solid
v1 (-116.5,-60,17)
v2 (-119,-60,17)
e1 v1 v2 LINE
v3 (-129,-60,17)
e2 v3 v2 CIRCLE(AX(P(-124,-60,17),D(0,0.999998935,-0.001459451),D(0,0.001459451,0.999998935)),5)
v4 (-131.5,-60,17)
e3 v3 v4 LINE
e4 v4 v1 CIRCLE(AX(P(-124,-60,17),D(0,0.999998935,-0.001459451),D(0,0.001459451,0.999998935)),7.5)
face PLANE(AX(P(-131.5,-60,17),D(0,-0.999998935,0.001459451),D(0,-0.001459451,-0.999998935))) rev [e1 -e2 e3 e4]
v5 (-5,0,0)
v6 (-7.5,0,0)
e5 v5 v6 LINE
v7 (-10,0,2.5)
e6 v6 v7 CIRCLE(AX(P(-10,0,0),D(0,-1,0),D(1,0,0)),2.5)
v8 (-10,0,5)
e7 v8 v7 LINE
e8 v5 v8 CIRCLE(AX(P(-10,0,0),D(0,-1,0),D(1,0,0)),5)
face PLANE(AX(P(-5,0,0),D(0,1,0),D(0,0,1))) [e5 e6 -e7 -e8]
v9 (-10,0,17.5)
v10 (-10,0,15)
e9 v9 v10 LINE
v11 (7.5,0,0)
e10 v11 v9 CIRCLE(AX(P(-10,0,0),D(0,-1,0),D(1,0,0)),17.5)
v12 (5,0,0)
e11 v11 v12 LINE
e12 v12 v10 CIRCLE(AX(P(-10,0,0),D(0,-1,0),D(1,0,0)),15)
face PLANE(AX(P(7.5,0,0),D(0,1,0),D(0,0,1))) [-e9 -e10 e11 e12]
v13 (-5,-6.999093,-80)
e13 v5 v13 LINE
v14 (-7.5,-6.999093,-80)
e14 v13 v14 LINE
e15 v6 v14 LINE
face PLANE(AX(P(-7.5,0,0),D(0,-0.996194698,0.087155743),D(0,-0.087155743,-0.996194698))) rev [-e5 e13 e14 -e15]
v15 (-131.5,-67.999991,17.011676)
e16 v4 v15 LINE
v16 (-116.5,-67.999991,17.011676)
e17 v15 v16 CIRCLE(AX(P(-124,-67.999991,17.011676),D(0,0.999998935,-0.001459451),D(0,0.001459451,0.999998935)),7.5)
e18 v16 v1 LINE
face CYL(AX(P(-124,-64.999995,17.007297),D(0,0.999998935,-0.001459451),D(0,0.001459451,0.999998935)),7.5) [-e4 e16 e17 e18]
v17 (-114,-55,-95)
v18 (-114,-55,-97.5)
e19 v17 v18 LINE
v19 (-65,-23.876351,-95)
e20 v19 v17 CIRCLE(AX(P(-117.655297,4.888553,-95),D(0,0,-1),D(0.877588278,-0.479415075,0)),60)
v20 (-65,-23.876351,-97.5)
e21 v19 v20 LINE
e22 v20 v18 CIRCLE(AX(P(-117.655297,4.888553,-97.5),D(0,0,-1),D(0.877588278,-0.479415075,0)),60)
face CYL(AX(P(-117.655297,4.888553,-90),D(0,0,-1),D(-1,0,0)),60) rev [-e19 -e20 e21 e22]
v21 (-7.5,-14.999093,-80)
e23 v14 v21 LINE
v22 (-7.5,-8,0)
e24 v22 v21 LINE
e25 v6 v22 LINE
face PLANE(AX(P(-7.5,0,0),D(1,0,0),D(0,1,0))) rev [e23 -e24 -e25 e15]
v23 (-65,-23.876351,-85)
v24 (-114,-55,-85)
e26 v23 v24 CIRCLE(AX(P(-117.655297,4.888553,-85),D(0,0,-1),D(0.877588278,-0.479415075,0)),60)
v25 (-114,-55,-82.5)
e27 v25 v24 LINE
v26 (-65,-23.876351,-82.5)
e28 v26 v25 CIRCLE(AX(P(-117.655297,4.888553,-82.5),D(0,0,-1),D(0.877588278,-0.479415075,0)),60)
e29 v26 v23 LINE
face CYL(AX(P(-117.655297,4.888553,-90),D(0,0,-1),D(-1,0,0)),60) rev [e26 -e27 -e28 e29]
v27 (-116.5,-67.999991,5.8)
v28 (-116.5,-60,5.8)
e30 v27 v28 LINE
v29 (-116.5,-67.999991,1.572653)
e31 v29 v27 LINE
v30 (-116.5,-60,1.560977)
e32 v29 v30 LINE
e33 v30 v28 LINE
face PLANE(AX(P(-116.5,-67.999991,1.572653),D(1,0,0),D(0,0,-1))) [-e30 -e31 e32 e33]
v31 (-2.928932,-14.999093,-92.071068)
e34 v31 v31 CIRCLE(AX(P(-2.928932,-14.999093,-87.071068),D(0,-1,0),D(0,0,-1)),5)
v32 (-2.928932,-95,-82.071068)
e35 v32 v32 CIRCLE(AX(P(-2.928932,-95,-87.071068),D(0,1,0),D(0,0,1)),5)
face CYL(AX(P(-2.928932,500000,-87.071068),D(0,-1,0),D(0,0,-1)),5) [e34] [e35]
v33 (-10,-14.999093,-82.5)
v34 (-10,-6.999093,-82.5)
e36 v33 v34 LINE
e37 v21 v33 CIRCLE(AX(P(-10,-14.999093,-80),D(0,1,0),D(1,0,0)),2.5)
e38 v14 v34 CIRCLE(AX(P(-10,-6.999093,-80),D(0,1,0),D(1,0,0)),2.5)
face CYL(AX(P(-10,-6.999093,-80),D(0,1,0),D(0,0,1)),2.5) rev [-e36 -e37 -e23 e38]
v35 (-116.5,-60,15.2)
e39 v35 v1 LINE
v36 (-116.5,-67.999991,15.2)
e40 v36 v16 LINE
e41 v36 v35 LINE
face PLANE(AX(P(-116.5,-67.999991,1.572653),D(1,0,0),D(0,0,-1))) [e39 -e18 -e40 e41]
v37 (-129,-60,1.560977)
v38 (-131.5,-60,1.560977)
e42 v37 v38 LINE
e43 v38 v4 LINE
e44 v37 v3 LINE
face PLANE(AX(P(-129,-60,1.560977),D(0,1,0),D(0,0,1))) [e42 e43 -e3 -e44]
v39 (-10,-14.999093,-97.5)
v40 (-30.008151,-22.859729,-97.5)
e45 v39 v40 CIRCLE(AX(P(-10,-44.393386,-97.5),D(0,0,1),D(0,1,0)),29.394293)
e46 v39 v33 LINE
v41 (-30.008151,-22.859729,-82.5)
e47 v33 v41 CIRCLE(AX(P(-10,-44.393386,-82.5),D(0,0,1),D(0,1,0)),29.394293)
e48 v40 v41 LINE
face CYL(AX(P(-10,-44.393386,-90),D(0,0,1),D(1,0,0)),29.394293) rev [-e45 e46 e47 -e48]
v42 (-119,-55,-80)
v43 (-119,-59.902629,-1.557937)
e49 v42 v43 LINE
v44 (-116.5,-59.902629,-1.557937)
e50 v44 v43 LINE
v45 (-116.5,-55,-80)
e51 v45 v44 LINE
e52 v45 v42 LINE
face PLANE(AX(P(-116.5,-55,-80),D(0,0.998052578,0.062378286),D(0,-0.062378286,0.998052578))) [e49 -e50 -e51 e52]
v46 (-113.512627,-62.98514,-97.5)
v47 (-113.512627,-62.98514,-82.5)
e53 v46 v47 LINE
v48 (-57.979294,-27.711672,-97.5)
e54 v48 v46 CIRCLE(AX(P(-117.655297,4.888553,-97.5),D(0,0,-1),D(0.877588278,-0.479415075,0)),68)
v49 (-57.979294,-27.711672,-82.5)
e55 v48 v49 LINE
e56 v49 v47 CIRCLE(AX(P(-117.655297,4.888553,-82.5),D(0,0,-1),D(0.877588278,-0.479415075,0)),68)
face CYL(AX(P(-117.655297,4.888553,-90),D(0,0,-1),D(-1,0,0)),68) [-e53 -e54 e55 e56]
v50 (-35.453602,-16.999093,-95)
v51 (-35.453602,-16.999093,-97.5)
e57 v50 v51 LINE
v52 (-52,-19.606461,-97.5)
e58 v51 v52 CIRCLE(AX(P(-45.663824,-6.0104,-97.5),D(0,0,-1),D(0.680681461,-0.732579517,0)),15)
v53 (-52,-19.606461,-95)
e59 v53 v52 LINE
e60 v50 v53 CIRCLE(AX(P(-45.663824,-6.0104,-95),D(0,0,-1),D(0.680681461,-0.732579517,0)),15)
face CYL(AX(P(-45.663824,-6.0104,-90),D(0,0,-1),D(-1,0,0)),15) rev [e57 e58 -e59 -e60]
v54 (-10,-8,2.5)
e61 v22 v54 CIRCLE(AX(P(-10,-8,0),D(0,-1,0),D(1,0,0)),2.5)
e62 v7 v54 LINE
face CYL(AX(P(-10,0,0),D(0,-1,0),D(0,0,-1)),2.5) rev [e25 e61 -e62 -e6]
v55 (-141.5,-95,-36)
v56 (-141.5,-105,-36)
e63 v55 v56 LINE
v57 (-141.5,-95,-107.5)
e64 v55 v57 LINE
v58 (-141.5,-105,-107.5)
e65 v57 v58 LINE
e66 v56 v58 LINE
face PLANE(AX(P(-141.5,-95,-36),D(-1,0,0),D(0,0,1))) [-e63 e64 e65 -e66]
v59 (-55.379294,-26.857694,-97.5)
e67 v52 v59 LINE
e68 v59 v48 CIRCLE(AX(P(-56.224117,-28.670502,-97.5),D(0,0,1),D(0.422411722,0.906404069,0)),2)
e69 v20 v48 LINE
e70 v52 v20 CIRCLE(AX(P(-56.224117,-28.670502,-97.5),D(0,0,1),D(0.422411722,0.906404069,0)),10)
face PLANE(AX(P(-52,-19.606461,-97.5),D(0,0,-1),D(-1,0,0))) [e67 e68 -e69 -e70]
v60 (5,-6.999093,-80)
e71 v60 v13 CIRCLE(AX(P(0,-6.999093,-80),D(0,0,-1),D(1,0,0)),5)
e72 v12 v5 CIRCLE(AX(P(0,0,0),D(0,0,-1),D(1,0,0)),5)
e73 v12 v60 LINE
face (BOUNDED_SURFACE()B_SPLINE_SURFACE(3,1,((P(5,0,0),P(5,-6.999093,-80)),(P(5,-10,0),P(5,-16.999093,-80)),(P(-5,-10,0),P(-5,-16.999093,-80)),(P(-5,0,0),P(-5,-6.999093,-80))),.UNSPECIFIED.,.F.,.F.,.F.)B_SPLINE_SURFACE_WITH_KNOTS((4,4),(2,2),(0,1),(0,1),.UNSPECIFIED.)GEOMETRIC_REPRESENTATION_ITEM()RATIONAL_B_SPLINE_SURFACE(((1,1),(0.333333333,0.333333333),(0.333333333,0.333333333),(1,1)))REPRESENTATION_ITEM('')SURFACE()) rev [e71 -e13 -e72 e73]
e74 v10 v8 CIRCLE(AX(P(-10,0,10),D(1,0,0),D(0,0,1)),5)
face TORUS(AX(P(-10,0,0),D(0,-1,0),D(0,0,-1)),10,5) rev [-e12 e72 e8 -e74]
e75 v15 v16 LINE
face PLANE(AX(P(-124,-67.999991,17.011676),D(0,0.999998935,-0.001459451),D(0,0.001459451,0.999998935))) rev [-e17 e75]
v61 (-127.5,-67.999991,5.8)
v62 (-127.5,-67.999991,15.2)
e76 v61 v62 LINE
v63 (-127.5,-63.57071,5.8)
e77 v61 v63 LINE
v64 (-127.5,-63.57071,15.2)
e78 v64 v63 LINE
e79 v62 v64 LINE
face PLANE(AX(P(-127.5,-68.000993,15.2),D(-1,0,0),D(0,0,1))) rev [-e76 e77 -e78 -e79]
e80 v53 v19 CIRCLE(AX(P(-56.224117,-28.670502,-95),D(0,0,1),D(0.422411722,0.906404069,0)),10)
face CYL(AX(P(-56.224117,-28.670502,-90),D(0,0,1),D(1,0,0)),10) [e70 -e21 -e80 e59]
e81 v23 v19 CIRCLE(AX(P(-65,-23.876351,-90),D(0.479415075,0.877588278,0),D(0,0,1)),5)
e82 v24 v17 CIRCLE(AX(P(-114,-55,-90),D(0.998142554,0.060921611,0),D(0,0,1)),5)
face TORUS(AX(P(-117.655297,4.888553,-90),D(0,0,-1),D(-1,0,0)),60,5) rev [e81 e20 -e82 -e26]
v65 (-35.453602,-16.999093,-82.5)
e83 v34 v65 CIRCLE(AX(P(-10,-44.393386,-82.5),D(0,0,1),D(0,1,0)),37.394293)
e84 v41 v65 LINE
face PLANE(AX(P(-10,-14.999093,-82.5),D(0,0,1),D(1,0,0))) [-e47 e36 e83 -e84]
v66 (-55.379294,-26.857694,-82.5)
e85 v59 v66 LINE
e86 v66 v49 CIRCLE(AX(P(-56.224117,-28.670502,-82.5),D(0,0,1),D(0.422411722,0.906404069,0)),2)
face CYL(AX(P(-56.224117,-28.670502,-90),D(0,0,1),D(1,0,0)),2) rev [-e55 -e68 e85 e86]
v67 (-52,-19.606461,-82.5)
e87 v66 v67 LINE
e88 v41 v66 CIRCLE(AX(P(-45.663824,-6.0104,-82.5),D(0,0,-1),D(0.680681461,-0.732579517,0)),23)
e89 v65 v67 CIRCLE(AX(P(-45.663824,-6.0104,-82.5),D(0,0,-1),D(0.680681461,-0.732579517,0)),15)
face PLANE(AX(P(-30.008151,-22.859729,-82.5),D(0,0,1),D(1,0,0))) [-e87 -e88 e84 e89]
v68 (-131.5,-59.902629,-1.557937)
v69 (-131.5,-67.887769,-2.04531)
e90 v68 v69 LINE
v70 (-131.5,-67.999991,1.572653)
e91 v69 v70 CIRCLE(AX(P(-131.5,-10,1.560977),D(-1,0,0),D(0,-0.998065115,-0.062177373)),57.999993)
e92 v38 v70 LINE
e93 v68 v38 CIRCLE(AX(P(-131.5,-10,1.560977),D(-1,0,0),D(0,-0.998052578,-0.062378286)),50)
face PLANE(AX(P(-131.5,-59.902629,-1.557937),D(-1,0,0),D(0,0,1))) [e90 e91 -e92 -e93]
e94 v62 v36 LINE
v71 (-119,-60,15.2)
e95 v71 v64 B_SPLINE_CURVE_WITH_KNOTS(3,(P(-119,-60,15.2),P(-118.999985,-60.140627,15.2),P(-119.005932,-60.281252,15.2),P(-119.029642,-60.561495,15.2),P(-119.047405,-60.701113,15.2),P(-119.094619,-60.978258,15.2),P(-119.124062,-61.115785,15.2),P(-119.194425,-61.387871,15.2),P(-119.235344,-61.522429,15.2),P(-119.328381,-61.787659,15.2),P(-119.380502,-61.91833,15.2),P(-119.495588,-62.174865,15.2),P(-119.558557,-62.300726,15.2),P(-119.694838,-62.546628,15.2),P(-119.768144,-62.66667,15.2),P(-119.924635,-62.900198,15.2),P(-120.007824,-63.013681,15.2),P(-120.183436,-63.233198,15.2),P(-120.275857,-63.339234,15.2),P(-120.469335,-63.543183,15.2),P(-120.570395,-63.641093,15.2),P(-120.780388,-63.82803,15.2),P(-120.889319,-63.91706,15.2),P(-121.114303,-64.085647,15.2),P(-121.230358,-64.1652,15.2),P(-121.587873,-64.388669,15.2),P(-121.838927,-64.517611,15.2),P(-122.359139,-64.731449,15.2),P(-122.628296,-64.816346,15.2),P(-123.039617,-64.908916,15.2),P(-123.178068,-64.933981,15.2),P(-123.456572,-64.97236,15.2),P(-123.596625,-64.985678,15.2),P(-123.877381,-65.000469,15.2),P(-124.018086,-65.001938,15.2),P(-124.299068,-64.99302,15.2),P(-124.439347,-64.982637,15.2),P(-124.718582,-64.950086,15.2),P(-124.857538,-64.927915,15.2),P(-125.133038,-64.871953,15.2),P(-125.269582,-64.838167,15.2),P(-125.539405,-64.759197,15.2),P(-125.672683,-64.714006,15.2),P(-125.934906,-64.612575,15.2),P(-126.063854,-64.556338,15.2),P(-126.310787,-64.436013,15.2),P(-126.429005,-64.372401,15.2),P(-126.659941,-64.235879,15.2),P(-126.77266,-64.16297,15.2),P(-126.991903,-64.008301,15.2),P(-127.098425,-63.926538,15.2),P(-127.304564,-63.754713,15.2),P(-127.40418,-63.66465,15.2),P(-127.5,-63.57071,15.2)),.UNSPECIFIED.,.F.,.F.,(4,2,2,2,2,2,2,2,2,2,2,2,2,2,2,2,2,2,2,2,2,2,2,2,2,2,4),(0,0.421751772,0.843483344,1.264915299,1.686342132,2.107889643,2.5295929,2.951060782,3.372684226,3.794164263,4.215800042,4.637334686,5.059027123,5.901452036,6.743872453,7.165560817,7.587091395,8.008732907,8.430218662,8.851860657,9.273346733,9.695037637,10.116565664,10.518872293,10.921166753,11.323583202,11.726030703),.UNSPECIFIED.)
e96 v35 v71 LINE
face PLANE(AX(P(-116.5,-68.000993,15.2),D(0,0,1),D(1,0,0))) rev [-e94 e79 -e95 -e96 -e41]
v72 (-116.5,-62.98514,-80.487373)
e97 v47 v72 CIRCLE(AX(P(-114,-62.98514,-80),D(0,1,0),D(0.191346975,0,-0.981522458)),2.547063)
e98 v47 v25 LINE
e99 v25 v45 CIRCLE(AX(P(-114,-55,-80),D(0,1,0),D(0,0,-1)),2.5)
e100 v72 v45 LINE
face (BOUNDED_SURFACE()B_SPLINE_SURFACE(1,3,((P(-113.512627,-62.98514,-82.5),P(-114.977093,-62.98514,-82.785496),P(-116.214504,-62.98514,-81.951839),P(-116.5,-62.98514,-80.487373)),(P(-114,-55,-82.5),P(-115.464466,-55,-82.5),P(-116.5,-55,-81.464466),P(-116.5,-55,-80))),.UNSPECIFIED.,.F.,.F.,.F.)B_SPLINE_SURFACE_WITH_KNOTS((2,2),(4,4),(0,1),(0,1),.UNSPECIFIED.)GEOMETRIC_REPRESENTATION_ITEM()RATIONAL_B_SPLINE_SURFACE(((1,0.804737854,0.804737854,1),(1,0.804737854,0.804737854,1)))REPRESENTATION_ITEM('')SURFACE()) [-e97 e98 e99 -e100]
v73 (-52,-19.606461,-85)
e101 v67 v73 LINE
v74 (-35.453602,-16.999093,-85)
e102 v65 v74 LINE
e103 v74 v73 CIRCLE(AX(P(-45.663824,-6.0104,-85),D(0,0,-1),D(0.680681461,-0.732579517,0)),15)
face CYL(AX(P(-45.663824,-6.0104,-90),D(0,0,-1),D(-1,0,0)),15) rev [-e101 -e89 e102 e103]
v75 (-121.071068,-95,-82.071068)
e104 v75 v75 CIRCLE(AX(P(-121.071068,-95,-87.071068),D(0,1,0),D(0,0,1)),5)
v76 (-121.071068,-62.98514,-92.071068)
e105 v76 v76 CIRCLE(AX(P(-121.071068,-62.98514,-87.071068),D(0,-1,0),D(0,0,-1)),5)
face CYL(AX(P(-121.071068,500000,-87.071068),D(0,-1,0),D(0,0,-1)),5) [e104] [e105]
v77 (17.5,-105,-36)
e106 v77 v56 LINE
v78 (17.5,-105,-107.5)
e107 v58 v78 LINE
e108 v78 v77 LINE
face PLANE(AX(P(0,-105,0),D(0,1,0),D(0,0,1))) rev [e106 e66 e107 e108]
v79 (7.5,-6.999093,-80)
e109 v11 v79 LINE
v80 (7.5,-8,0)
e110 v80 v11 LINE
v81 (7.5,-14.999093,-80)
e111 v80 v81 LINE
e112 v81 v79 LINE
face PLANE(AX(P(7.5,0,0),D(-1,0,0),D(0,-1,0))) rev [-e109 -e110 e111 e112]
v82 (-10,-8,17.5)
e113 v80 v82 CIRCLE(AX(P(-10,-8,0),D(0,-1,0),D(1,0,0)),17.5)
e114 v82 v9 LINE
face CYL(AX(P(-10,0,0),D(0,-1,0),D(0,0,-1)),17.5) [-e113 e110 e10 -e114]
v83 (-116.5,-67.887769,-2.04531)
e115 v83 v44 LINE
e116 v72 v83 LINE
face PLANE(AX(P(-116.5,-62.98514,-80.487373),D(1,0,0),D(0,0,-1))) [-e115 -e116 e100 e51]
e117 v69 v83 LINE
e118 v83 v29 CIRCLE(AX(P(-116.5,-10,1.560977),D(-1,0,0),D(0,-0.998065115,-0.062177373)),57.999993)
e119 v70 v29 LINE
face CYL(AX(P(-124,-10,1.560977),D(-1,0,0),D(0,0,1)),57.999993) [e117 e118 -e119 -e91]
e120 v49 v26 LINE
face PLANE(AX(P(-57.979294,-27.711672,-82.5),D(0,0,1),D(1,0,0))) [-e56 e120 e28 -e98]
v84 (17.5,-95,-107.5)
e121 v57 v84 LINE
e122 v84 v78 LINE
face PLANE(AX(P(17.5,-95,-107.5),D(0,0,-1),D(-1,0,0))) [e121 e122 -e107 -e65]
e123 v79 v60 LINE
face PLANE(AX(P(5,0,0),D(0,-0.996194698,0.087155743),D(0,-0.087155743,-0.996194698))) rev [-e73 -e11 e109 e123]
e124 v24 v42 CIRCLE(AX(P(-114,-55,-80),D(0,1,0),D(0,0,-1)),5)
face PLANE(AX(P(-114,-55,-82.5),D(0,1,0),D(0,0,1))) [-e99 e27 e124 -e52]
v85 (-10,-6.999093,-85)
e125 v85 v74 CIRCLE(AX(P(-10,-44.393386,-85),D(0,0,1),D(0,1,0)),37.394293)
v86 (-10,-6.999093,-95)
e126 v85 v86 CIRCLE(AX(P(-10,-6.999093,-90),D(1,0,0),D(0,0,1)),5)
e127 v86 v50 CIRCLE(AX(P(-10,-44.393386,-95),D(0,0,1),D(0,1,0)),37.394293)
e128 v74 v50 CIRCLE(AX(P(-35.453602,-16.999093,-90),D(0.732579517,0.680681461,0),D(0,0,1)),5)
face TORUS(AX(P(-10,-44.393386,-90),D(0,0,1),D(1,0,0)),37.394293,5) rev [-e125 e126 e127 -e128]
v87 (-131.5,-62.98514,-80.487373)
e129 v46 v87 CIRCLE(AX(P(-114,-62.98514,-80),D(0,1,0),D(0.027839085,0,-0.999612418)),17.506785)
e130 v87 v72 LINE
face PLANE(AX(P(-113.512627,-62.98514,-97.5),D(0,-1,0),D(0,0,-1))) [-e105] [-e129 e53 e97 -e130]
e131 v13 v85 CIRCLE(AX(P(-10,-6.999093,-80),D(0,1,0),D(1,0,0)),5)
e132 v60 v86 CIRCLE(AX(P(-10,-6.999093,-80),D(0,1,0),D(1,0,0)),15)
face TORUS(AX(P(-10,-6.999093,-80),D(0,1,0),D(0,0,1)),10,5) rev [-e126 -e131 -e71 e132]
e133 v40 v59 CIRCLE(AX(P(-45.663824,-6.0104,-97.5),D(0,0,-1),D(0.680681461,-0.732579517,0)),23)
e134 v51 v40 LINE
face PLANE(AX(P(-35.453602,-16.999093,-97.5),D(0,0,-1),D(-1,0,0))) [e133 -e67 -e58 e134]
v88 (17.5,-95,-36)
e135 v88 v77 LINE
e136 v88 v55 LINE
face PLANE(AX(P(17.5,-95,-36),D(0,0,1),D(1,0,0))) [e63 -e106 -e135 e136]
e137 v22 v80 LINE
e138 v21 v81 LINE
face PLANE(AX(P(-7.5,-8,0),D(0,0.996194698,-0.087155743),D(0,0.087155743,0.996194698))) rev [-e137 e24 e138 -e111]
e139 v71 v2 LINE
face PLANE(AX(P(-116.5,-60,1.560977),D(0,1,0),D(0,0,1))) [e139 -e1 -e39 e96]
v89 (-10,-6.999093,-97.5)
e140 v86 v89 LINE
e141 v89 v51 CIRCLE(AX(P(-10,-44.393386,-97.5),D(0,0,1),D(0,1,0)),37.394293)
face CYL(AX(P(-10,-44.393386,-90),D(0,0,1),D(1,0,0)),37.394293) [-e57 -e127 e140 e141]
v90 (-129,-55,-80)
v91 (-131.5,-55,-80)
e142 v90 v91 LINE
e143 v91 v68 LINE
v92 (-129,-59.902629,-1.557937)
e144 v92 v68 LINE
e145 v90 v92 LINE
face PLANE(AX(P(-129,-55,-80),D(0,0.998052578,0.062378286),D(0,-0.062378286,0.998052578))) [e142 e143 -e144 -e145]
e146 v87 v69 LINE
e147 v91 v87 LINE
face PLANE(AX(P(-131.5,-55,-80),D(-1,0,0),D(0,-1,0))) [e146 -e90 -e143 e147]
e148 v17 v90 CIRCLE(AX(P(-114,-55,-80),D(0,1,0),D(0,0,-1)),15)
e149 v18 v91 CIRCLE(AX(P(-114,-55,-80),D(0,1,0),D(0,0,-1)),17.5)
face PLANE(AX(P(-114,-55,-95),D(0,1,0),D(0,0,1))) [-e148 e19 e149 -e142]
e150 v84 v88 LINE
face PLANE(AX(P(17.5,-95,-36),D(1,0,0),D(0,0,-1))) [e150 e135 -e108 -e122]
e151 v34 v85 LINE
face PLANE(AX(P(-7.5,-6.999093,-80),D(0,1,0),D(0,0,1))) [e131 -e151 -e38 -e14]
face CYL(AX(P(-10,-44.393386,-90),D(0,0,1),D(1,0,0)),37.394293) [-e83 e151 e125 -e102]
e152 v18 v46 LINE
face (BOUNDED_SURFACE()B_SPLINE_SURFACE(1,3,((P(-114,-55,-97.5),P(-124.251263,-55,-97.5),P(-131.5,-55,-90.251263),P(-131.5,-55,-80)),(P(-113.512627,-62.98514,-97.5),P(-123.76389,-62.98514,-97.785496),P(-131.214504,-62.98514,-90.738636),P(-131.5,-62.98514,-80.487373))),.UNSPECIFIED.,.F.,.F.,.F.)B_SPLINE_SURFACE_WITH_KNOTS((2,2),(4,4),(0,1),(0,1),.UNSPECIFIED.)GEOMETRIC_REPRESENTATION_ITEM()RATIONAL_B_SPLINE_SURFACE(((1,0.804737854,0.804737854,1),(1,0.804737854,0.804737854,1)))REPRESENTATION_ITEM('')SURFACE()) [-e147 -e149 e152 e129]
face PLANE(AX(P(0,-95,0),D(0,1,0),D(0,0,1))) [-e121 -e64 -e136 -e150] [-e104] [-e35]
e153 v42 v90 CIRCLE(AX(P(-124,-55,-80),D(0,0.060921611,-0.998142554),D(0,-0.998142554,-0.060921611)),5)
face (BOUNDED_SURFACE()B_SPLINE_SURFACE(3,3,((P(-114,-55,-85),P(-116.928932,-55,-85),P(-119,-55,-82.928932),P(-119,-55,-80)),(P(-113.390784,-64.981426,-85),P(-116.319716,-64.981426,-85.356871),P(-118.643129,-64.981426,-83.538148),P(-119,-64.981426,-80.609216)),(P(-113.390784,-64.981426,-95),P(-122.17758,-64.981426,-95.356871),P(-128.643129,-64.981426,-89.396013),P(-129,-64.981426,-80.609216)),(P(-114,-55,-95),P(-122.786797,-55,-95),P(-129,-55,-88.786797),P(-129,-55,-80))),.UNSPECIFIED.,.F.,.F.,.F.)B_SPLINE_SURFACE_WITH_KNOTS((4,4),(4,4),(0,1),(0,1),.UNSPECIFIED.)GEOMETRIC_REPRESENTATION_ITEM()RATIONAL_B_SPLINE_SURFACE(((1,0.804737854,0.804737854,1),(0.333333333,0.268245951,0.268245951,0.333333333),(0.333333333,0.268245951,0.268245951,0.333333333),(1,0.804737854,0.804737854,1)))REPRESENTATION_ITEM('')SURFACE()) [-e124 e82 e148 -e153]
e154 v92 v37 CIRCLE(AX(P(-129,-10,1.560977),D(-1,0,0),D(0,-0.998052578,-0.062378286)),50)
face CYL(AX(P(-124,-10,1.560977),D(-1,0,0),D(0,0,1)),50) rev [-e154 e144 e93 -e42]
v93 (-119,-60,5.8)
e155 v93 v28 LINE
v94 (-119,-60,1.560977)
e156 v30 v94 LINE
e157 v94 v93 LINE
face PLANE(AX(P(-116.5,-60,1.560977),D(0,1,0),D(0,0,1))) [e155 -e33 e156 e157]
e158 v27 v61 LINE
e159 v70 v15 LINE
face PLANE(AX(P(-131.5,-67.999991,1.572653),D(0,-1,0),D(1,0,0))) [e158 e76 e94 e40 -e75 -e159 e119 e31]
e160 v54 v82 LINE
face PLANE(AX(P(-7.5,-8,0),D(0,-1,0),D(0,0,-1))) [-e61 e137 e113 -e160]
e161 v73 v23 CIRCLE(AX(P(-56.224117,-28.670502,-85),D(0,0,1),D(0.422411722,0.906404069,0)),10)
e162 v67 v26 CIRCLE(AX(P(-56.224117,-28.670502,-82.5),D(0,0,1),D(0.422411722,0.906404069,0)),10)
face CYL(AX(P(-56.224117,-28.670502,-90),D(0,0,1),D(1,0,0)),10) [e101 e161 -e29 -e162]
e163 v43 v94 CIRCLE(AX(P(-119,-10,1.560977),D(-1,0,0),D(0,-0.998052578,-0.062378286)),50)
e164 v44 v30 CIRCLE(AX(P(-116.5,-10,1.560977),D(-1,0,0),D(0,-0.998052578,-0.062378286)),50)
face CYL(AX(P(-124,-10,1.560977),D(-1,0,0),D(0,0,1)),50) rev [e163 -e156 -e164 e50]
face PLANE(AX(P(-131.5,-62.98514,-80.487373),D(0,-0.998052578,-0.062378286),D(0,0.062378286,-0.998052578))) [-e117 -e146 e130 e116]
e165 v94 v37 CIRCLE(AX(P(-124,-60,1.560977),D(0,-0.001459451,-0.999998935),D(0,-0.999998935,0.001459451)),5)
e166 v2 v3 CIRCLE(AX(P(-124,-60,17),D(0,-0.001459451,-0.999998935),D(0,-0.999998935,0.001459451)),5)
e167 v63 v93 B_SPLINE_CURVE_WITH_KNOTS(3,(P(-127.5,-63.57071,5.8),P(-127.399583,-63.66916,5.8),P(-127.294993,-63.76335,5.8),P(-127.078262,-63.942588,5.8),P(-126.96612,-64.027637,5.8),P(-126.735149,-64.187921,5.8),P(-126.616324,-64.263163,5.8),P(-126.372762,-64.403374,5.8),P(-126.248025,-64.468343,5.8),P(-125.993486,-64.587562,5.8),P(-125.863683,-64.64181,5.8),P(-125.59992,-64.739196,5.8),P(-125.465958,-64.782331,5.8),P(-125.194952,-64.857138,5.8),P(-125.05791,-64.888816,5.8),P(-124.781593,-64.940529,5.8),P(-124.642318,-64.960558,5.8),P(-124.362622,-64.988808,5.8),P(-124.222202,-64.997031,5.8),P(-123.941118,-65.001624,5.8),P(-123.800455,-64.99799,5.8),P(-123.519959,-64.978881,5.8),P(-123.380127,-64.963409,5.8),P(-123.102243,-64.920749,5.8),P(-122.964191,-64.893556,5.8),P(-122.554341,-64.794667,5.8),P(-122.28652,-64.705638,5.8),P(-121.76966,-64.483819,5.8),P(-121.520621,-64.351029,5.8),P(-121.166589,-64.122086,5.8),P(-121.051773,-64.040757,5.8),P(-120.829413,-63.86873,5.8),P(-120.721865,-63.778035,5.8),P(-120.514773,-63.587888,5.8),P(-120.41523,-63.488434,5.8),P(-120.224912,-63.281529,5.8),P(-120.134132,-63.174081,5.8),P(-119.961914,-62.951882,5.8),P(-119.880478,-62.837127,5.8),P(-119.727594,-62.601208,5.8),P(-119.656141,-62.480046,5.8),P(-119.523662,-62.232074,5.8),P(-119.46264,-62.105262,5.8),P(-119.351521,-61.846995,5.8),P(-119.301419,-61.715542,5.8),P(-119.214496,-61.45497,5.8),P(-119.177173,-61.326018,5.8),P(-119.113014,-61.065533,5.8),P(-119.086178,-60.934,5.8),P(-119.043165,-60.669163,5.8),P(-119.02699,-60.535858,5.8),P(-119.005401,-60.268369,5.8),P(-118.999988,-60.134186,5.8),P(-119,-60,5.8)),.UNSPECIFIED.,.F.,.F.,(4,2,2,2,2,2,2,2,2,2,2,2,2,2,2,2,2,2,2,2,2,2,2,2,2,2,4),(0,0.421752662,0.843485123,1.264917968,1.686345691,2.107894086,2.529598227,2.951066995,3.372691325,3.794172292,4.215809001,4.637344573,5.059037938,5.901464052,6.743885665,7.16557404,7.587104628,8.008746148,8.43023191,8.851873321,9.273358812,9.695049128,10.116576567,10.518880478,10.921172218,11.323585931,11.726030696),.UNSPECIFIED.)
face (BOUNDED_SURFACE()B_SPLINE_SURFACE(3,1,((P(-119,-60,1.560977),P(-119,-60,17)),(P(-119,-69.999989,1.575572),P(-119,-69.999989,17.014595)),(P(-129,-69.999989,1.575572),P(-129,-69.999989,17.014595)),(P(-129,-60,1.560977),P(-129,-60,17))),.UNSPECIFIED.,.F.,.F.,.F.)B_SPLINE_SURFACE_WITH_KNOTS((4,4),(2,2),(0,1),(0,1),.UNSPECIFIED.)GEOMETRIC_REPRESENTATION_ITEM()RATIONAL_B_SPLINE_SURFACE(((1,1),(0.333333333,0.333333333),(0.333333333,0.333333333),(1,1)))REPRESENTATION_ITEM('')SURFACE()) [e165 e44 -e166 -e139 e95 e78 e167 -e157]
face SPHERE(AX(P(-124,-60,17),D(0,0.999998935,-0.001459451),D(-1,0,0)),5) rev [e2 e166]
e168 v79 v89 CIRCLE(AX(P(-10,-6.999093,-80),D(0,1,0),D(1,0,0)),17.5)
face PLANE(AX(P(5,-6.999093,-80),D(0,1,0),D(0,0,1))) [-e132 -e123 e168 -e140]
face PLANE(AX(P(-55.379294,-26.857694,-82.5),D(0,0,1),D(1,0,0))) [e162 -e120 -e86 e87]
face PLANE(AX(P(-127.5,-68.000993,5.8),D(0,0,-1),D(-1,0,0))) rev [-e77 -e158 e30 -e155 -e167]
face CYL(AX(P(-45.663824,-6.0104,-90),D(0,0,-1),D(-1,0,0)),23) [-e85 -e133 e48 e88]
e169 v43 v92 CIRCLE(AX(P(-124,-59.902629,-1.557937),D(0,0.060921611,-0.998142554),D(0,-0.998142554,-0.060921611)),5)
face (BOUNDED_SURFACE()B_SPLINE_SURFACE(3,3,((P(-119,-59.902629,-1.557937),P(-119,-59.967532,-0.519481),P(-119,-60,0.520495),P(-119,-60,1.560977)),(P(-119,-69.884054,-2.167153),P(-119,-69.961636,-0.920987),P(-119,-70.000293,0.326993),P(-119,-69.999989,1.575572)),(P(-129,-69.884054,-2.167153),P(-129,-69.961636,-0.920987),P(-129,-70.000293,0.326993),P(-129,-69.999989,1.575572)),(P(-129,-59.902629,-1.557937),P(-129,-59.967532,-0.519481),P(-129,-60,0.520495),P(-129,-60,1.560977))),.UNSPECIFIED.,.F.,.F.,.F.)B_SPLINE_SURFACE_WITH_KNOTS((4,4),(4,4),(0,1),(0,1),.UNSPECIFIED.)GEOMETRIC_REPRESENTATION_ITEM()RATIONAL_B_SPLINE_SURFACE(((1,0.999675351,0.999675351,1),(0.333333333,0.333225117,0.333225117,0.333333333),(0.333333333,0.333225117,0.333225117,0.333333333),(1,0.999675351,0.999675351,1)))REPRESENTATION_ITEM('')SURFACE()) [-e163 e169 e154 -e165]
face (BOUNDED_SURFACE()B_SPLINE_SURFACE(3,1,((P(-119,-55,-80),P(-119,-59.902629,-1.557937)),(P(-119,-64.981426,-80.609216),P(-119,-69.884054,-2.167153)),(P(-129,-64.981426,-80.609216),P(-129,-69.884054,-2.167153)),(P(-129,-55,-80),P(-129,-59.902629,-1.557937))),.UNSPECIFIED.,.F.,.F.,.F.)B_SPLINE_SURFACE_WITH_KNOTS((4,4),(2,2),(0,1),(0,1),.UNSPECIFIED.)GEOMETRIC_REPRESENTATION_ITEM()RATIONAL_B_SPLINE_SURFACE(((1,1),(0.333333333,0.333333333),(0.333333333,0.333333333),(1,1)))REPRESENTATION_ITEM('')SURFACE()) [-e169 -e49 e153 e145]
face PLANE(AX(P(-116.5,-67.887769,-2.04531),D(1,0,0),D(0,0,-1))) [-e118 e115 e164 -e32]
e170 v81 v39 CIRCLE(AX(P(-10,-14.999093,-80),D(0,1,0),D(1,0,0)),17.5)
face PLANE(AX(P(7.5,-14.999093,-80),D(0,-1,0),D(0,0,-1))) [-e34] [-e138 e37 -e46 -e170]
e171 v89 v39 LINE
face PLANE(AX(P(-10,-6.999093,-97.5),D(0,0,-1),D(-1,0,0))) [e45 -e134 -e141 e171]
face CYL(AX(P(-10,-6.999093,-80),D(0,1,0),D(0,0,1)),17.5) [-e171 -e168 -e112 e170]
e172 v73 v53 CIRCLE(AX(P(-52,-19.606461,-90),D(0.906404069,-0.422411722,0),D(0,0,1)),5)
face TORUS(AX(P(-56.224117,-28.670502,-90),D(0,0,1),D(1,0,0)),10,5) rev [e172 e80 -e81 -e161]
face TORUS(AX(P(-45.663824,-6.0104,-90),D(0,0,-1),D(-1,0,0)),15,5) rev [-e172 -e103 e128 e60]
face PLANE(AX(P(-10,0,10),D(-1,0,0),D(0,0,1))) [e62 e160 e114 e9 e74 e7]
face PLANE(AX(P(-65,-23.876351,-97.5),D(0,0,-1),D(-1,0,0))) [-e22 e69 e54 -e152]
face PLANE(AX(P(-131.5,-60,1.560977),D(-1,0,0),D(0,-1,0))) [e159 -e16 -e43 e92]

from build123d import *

# Parameters (mm, degrees)
REVOLVE_1_ANGLE     = 180
CUT_EXTRUDE_1_REACH = 179.268
SKETCH_26_W         = 11
SKETCH_26_H         = 9.4
SKETCH_30_W         = 159
SKETCH_30_H         = 71.5
EXTRUDE_3_DEPTH     = 10
EXTRUDE_4_REACH     = 203.503
SKETCH_31_R         = 5


# Read off the part's stored shape, not the designer's step: 旋轉1
with BuildPart() as part:
    # 掃出1: sweep along a path in 草圖1
    with BuildLine(Plane(origin=(0, 0, 0), x_dir=(0, 0, -1), z_dir=(1, 0, 0))) as sweep_1_path:
        Line((0, 0), (80, -6.999093082))
    # 草圖8 → 掃出1 (sweep)
    with BuildSketch(Plane.XY):
        with BuildLine():
            Line((5, 0), (7.5, 0))
            Line((7.5, 0), (7.5, -8))
            Line((7.5, -8), (-7.5, -8))
            Line((-7.5, -8), (-7.5, 0))
            Line((-7.5, 0), (-5, 0))
            ThreePointArc((-5, 0), (0, -5), (5, 0))
        make_face()
    sweep(path=sweep_1_path.line)

    # 掃出2: sweep along a path in 草圖3
    with BuildLine(Plane(origin=(0, -6.999093082, 0), x_dir=(1, 0, 0), z_dir=(0, 1, 0))) as sweep_2_path:
        ThreePointArc((0, 80), (-2.928932188, 87.071067812), (-10, 90))
    # 草圖15 → 掃出2 (sweep)
    with BuildSketch(Plane(origin=(0, 0, -80), x_dir=(-1, 0, 0), z_dir=(0, 0, -1))):
        with BuildLine():
            Line((7.5, -14.999093082), (7.5, -6.999093082))
            Line((7.5, -6.999093082), (5, -6.999093082))
            ThreePointArc((5, -6.999093082), (0, -11.999093082), (-5, -6.999093082))
            Line((-5, -6.999093082), (-7.5, -6.999093082))
            Line((-7.5, -6.999093082), (-7.5, -14.999093082))
            Line((-7.5, -14.999093082), (7.5, -14.999093082))
        make_face()
    sweep(path=sweep_2_path.line)

    # 掃出6: sweep along a path in 草圖4
    with BuildLine(Plane.XY.offset(-90)) as sweep_6_path:
        ThreePointArc((-114, -55), (-85.48557321, -45.758350859), (-65, -23.876351309))
        ThreePointArc((-65, -23.876351309), (-59.344635199, -19.169851161), (-52, -19.606461369))
        ThreePointArc((-52, -19.606461369), (-43.328947167, -20.827564341), (-35.453602253, -16.999093082))
        ThreePointArc((-35.453602253, -16.999093082), (-23.673751019, -9.588764492), (-10, -6.999093082))
    # 草圖19 → 掃出6 (sweep)
    with BuildSketch(Plane.ZY.offset(10)):
        with BuildLine():
            Line((-97.5, -14.999093082), (-82.5, -14.999093082))
            Line((-82.5, -14.999093082), (-82.5, -6.999093082))
            Line((-82.5, -6.999093082), (-85, -6.999093082))
            ThreePointArc((-85, -6.999093082), (-90, -11.999093082), (-95, -6.999093082))
            Line((-95, -6.999093082), (-97.5, -6.999093082))
            Line((-97.5, -6.999093082), (-97.5, -14.999093082))
        make_face()
    sweep(path=sweep_6_path.line)

    # 掃出7: sweep along a path in 草圖5
    with BuildLine(Plane(origin=(0, -55, 0), x_dir=(1, 0, 0), z_dir=(0, 1, 0))) as sweep_7_path:
        ThreePointArc((-114, 90), (-121.071067812, 87.071067812), (-124, 80))
    # 草圖20 → 掃出7 (sweep)
    with BuildSketch(Plane(origin=(-116.921360423, -7.136292944, 0), x_dir=(0, 0, 1), z_dir=(-0.9981425535898466, -0.06092161121589024, 0))):
        with BuildLine():
            Line((-97.5, -47.952776769), (-97.5, -55.952776769))
            Line((-97.5, -55.952776769), (-82.5, -55.952776769))
            Line((-82.5, -55.952776769), (-82.5, -47.952776769))
            Line((-82.5, -47.952776769), (-85, -47.952776769))
            ThreePointArc((-85, -47.952776769), (-90, -52.952776769), (-95, -47.952776769))
            Line((-95, -47.952776769), (-97.5, -47.952776769))
        make_face()
    sweep(path=sweep_7_path.line)

    # 掃出8: sweep along a path in 草圖6
    with BuildLine(Plane(origin=(-124, 0, 0), x_dir=(0, 0, -1), z_dir=(1, 0, 0))) as sweep_8_path:
        Line((80, -55), (1.557937214, -59.902628924))
        ThreePointArc((1.557937214, -59.902628924), (-0.000760155, -59.975651302), (-1.560977094, -60))
        Line((-1.560977094, -60), (-17, -60))
    # 草圖21 → 掃出8 (sweep)
    with BuildSketch(Plane(origin=(0, 4.660546858, -76.358619691), x_dir=(1, 0, 0), z_dir=(0, -0.06092161121589024, 0.9981425535898466))):
        with BuildLine():
            Line((-129, -59.771569345), (-131.5, -59.771569345))
            Line((-131.5, -59.771569345), (-131.5, -67.771569345))
            Line((-131.5, -67.771569345), (-116.5, -67.771569345))
            Line((-116.5, -67.771569345), (-116.5, -59.771569345))
            Line((-116.5, -59.771569345), (-119, -59.771569345))
            ThreePointArc((-119, -59.771569345), (-124, -64.771569345), (-129, -59.771569345))
        make_face()
    sweep(path=sweep_8_path.line)

    # 掃出9: sweep along a path in 草圖22
    with BuildLine(Plane(origin=(0, 0, 0), x_dir=(1, 0, 0), z_dir=(0, 1, 0))) as sweep_9_path:
        ThreePointArc((0, 0), (-2.928932188, -7.071067812), (-10, -10))
    # 草圖23 → 掃出9 (sweep)
    with BuildSketch(Plane.XY):
        with BuildLine():
            Line((-7.5, 0), (-7.5, -8))
            Line((-7.5, -8), (7.5, -8))
            Line((7.5, -8), (7.5, 0))
            Line((7.5, 0), (5, 0))
            ThreePointArc((5, 0), (0, -5), (-5, 0))
            Line((-5, 0), (-7.5, 0))
        make_face()
    sweep(path=sweep_9_path.line)

    # 旋轉1 outline → 旋轉1 (revolve)
    with BuildSketch(Plane(origin=(-124, 0.024682835, 16.912396843), x_dir=(-1, 0, 0), z_dir=(1.4532479245137334e-14, -0.0014594506721384598, -0.9999989350013008))):
        with BuildLine():
            Line((7.5, -68.024746762), (7.5, -60.024746762))
            Line((7.5, -60.024746762), (5, -60.024746762))
            ThreePointArc((5, -60.024746762), (3.535533906, -63.560280668), (0, -65.024746762))
            Line((0, -65.024746762), (0, -68.024746762))
            Line((0, -68.024746762), (7.5, -68.024746762))
        make_face()
    revolve(axis=Axis((-124, 0.024682835, 16.912396843), (0, 0.9999989350013008, -0.0014594506721384598)), revolution_arc=REVOLVE_1_ANGLE)

    # 草圖26 → 除料-伸長1 (cut, up to next)
    with BuildSketch(Plane(origin=(0, 0, 0), x_dir=(1, 0, 0), z_dir=(0, 1, 0)), mode=Mode.PRIVATE) as cut_extrude_1_sk1:
        with Locations((-122, -10.5)):
            Rectangle(SKETCH_26_W, SKETCH_26_H)
    cut_extrude_1_tool1 = extrude(cut_extrude_1_sk1.sketch, amount=-CUT_EXTRUDE_1_REACH, mode=Mode.PRIVATE) & part.part
    add(cut_extrude_1_tool1.solids().sort_by_distance((-122, 0, 10.5))[0], mode=Mode.SUBTRACT)

    # 草圖31 → 填料-伸長4 (add, up to next)
    with BuildSketch(Plane(origin=(0, -95, 0), x_dir=(1, 0, 0), z_dir=(0, 1, 0)), mode=Mode.PRIVATE) as extrude_4_sk1:
        with Locations(Location((-121.071067812, 87.071067812, 0), (0, 0, 90))):
            Circle(SKETCH_31_R)
    extrude_4_tool1 = extrude(extrude_4_sk1.sketch, amount=EXTRUDE_4_REACH, mode=Mode.PRIVATE) - part.part
    # 草圖31 → 填料-伸長4 (add, up to next)
    with BuildSketch(Plane(origin=(0, -95, 0), x_dir=(1, 0, 0), z_dir=(0, 1, 0)), mode=Mode.PRIVATE) as extrude_4_sk2:
        with Locations(Location((-2.928932188, 87.071067812, 0), (0, 0, 90))):
            Circle(SKETCH_31_R)
    extrude_4_tool2 = extrude(extrude_4_sk2.sketch, amount=EXTRUDE_4_REACH, mode=Mode.PRIVATE) - part.part


with BuildPart() as body_2:
    # 草圖30 → 填料-伸長3 (new body)
    with BuildSketch(Plane(origin=(0, -105, 0), x_dir=(-1, 0, 0), z_dir=(0, -1, 0))):
        with Locations((62, 71.75)):
            Rectangle(SKETCH_30_W, SKETCH_30_H)
    extrude(amount=-EXTRUDE_3_DEPTH)


with BuildPart() as part_1:
    add(part.part)

    add(body_2.part)  # 填料-伸長4 merges body 2
    add(extrude_4_tool1.solids().sort_by_distance((-121.071068, -95, -87.071068))[0])
    add(extrude_4_tool2.solids().sort_by_distance((-2.928932, -95, -87.071068))[0])


solid = part_1.part
